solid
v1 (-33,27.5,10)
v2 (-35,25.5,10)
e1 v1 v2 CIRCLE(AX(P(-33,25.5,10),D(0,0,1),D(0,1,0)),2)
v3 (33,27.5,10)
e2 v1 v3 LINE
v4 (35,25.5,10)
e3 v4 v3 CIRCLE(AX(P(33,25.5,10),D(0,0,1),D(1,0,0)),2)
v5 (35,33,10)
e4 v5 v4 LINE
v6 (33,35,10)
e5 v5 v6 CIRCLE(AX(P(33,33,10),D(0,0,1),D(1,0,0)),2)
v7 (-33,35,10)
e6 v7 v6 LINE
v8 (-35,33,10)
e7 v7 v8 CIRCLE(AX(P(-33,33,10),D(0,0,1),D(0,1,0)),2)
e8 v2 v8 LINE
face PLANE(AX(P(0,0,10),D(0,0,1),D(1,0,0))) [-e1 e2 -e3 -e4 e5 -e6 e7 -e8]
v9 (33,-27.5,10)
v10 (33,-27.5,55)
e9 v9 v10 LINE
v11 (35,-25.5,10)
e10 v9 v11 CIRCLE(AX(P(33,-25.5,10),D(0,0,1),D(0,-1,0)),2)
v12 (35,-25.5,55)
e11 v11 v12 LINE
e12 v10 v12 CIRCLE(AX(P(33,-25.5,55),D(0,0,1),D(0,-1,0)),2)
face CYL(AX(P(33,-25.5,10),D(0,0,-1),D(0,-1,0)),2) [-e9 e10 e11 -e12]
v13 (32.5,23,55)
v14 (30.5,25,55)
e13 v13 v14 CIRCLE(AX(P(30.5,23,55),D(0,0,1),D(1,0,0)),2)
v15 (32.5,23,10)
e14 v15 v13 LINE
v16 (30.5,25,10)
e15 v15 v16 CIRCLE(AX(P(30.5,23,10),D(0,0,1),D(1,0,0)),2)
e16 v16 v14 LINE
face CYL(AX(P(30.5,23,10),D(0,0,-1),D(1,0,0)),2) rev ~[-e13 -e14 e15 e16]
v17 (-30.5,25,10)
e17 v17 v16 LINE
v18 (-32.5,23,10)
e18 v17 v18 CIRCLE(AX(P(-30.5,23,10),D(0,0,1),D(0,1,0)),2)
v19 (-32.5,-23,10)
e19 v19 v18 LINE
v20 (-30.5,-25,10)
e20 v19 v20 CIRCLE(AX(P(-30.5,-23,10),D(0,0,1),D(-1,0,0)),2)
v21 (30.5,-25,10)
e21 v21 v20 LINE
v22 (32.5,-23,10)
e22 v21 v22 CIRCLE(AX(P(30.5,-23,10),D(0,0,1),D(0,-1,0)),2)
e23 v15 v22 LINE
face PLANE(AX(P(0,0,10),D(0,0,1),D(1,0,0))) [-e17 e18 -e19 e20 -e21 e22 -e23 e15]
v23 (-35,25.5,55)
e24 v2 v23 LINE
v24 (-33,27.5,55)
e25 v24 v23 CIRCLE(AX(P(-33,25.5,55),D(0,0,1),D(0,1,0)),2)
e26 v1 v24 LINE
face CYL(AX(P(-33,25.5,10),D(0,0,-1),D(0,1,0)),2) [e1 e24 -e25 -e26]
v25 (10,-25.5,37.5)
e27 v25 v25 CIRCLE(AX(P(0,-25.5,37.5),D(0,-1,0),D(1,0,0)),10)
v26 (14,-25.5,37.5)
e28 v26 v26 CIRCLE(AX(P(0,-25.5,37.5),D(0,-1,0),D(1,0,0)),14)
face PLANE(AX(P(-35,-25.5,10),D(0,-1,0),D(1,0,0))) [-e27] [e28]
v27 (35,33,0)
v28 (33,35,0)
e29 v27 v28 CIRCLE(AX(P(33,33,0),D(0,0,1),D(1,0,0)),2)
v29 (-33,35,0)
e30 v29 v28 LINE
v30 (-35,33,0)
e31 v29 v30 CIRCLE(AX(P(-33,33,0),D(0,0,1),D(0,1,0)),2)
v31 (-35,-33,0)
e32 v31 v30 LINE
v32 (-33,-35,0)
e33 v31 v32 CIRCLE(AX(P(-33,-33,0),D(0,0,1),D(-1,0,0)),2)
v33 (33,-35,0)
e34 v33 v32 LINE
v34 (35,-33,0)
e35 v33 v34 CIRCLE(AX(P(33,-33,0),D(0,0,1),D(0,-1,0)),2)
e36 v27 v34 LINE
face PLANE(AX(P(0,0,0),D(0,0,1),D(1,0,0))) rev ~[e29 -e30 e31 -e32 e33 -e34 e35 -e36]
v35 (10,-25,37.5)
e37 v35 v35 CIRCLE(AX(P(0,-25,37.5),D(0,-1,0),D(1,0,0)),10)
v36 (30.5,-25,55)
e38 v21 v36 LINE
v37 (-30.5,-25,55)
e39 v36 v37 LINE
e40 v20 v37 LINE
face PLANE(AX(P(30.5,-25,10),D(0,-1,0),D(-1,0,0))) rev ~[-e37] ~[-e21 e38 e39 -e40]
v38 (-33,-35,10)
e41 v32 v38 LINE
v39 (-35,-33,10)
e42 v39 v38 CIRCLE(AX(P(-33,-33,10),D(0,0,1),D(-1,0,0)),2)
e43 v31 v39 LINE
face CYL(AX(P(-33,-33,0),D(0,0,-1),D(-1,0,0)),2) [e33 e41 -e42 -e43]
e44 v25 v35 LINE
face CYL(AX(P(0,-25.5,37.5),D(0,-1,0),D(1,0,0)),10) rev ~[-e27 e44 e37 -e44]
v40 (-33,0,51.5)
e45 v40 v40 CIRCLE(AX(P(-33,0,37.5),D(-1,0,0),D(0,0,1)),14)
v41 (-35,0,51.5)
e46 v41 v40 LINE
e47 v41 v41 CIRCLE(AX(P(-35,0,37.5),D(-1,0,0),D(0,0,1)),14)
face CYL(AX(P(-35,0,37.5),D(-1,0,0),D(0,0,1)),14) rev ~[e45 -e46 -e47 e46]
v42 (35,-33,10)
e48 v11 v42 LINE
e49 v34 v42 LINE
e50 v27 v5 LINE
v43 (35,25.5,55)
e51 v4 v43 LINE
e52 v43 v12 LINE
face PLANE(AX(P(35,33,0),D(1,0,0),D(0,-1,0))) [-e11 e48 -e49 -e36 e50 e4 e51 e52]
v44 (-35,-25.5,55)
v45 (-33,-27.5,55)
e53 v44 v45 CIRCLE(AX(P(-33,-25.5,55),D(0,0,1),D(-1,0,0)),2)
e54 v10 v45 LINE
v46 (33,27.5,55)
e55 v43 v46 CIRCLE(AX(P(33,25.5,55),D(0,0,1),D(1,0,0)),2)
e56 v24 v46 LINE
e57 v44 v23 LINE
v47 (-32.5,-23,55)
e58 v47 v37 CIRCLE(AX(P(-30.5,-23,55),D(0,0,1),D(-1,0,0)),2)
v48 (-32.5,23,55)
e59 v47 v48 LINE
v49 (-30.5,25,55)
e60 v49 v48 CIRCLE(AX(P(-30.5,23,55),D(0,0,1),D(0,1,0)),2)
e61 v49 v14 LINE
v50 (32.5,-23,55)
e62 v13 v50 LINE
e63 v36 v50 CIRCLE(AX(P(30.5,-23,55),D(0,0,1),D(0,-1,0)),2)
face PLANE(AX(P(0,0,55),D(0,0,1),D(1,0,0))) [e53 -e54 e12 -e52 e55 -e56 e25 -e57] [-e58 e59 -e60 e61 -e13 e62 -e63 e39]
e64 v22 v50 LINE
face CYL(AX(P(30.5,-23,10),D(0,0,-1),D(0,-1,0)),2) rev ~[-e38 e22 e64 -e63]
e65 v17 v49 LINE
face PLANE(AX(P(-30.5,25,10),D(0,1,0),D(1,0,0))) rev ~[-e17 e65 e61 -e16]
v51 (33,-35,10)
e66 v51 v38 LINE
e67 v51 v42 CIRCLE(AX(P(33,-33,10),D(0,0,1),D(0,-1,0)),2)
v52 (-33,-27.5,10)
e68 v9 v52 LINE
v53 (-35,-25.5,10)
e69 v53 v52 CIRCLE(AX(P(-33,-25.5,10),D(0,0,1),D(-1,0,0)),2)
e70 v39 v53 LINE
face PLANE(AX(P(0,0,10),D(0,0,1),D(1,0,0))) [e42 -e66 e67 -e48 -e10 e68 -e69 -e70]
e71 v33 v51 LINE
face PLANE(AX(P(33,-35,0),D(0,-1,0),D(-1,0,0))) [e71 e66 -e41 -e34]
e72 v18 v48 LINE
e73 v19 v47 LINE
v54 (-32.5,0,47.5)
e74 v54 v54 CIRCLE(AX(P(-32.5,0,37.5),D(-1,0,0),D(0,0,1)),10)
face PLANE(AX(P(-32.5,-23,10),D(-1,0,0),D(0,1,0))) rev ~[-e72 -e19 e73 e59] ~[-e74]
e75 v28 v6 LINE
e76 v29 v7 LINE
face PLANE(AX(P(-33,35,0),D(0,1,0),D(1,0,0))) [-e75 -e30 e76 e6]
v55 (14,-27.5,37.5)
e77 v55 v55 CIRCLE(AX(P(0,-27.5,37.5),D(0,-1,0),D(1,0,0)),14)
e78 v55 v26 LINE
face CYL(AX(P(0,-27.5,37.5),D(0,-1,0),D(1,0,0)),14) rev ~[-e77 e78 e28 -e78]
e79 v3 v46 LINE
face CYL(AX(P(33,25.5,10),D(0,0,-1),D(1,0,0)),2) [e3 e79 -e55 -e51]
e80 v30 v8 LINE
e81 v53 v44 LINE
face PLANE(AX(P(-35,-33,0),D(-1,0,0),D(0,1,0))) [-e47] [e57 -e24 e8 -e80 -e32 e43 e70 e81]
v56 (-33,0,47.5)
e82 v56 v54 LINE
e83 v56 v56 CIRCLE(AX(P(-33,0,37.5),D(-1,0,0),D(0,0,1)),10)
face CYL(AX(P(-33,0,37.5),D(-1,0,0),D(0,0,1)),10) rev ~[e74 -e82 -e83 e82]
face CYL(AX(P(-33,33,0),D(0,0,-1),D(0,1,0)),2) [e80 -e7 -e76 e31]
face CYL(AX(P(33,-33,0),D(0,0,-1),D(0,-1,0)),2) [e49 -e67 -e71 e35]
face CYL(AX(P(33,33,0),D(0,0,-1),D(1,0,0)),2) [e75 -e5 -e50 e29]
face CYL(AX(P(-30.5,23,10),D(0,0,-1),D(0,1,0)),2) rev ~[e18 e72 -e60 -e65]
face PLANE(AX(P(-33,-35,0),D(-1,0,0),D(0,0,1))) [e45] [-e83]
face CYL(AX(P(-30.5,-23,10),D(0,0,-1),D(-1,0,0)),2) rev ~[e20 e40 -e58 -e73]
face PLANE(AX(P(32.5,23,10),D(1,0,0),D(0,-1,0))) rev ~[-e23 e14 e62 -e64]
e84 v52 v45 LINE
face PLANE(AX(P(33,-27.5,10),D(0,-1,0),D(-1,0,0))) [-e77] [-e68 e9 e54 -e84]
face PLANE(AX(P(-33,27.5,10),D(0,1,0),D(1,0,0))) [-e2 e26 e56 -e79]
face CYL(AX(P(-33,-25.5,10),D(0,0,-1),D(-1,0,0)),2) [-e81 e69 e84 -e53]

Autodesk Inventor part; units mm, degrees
ref_plane "YZ Plane" through (0, 0, 0) normal (1, 0, 0) x (0, 1, 0)
ref_plane "XZ Plane" through (0, 0, 0) normal (0, 1, 0) x (-1, 0, 0)
ref_plane "XY Plane" through (0, 0, 0) normal (0, 0, 1) x (1, 0, 0)
sketch "Sketch1" plane through (0, 0, 0) normal (0, 0, 1) x (1, 0, 0)
  line L0 (-33, 35) -> (33, 35)
  line L1 (35, 33) -> (35, -33)
  line L2 (33, -35) -> (-33, -35)
  line L3 (-35, -33) -> (-35, 33)
  arc A0 (-35, -33) -> (-33, -35) centre (-33, -33) ccw
  arc A1 (-33, 35) -> (-35, 33) centre (-33, 33) ccw
  arc A2 (35, 33) -> (33, 35) centre (33, 33) ccw
  arc A3 (33, -35) -> (35, -33) centre (33, -33) ccw
  point P0 (0, 0)
  point P1 (-35, 35)
  point P2 (35, -35)
  point P3 (35, 35)
  point P4 (-35, -35)
  dimension "d0" = 70
  dimension "d1" = 35
  dimension "d2" = 70
  dimension "d3" = 35
  dimension "d85" = 2
extrude "Extrusion1" add sketch "Sketch1" along normal blind 10
sketch "Sketch3" plane through (0, 0, 10) normal (0, 0, 1) x (1, 0, 0)
  line L0 (-33, 27.5) -> (33, 27.5)
  line L1 (35, 25.5) -> (35, -25.5)
  line L2 (33, -27.5) -> (-33, -27.5)
  line L3 (-35, -25.5) -> (-35, 25.5)
  line L4 (-35, 33) -> (-35, -33) projected
  line L5 (-30.5, 25) -> (30.5, 25)
  line L6 (32.5, 23) -> (32.5, -23)
  line L7 (30.5, -25) -> (-30.5, -25)
  line L8 (-32.5, -23) -> (-32.5, 23)
  arc A0 (-35, -25.5) -> (-33, -27.5) centre (-33, -25.5) ccw
  arc A1 (-32.5, -23) -> (-30.5, -25) centre (-30.5, -23) ccw
  arc A2 (33, -27.5) -> (35, -25.5) centre (33, -25.5) ccw
  arc A3 (30.5, -25) -> (32.5, -23) centre (30.5, -23) ccw
  arc A4 (32.5, 23) -> (30.5, 25) centre (30.5, 23) ccw
  arc A5 (-30.5, 25) -> (-32.5, 23) centre (-30.5, 23) ccw
  arc A6 (-33, 27.5) -> (-35, 25.5) centre (-33, 25.5) ccw
  arc A7 (35, 25.5) -> (33, 27.5) centre (33, 25.5) ccw
  point P0 (0, 0)
  point P1 (-35, 27.5)
  point P2 (35, -27.5)
  point P3 (35, 27.5)
  point P4 (-35, -27.5)
  point P5 (-35, 35)
  point P6 (-35, -35)
  point P7 (-32.5, 25)
  point P8 (32.5, -25)
  point P9 (32.5, 25)
  point P10 (-32.5, -25)
  dimension "d17" = 70
  dimension "d18" = 55
  dimension "d19" = 27.5
  dimension "d20" = 2.5
  dimension "d21" = 2.5
  dimension "d22" = 2.5
  dimension "d23" = 2.5
  dimension "d86" = 2
extrude "Extrusion2" add sketch "Sketch3" along normal blind 45
sketch "Sketch9" plane through (-35, -27.5, 10) normal (0, -1, 0) x (1, 0, 0)
  circle A0 centre (35, 27.5) radius 14
  line L0 (0, 0) -> (0, 45) projected
  line L1 (2, 0) -> (68, 0) projected
  point P0 (35, -10)
  point P1 (70, 0)
  dimension "d60" = 28
  dimension "d61" = 35
  dimension "d62" = 27.5
extrude "Extrusion8" cut sketch "Sketch9" against normal blind 2
sketch "Sketch10" plane through (0, -25.5, 37.5) normal (0, -1, 0) x (1, 0, 0)
  circle A0 centre (0, 0) radius 10
  point P0 (0, -37.5)
  dimension "d65" = 20
extrude "Extrusion9" cut sketch "Sketch10" against normal blind 2
sketch "Sketch13" plane through (-35, -35, 0) normal (-1, 0, 0) x (0, 0, 1)
  circle A0 centre (37.5, 35) radius 14
  line L0 (0, 68) -> (0, 2) projected
  line L1 (10, 68) -> (10, 60.5) projected
  point P0 (0, 35)
  point P1 (0, 35)
  point P2 (0, 0)
  point P3 (0, 70)
  point P4 (10, 70)
  point P5 (10, 62.5)
  point P6 (10, 7.5)
  dimension "d76" = 28
  dimension "d82" = 27.5
extrude "Extrusion12" cut sketch "Sketch13" against normal blind 2
sketch "Sketch14" plane through (-33, 0, 37.5) normal (-1, 0, 0) x (0, 0, 1)
  circle A0 centre (0, 0) radius 10
  line L0 (-37.5, 33) -> (-37.5, -33) projected
  line L1 (-27.5, 33) -> (-27.5, 25.5) projected
  point P0 (-37.5, 0)
  point P1 (-37.5, 0)
  point P2 (-37.5, -35)
  point P3 (-37.5, 35)
  point P4 (-27.5, 35)
  point P5 (-27.5, 27.5)
  point P6 (-27.5, -27.5)
  dimension "d80" = 20
  dimension "d81" = 27.5
extrude "Extrusion13" cut sketch "Sketch14" against normal blind 2
equation "\"d1\" = 0.5 * d0"
equation "\"d3\" = 0.5 * d2"
equation "\"d19\" = 0.5 * d18"
equation "\"d21\" = d20"
properties part number "sampleChamber_singlePiece_filipeSample"
